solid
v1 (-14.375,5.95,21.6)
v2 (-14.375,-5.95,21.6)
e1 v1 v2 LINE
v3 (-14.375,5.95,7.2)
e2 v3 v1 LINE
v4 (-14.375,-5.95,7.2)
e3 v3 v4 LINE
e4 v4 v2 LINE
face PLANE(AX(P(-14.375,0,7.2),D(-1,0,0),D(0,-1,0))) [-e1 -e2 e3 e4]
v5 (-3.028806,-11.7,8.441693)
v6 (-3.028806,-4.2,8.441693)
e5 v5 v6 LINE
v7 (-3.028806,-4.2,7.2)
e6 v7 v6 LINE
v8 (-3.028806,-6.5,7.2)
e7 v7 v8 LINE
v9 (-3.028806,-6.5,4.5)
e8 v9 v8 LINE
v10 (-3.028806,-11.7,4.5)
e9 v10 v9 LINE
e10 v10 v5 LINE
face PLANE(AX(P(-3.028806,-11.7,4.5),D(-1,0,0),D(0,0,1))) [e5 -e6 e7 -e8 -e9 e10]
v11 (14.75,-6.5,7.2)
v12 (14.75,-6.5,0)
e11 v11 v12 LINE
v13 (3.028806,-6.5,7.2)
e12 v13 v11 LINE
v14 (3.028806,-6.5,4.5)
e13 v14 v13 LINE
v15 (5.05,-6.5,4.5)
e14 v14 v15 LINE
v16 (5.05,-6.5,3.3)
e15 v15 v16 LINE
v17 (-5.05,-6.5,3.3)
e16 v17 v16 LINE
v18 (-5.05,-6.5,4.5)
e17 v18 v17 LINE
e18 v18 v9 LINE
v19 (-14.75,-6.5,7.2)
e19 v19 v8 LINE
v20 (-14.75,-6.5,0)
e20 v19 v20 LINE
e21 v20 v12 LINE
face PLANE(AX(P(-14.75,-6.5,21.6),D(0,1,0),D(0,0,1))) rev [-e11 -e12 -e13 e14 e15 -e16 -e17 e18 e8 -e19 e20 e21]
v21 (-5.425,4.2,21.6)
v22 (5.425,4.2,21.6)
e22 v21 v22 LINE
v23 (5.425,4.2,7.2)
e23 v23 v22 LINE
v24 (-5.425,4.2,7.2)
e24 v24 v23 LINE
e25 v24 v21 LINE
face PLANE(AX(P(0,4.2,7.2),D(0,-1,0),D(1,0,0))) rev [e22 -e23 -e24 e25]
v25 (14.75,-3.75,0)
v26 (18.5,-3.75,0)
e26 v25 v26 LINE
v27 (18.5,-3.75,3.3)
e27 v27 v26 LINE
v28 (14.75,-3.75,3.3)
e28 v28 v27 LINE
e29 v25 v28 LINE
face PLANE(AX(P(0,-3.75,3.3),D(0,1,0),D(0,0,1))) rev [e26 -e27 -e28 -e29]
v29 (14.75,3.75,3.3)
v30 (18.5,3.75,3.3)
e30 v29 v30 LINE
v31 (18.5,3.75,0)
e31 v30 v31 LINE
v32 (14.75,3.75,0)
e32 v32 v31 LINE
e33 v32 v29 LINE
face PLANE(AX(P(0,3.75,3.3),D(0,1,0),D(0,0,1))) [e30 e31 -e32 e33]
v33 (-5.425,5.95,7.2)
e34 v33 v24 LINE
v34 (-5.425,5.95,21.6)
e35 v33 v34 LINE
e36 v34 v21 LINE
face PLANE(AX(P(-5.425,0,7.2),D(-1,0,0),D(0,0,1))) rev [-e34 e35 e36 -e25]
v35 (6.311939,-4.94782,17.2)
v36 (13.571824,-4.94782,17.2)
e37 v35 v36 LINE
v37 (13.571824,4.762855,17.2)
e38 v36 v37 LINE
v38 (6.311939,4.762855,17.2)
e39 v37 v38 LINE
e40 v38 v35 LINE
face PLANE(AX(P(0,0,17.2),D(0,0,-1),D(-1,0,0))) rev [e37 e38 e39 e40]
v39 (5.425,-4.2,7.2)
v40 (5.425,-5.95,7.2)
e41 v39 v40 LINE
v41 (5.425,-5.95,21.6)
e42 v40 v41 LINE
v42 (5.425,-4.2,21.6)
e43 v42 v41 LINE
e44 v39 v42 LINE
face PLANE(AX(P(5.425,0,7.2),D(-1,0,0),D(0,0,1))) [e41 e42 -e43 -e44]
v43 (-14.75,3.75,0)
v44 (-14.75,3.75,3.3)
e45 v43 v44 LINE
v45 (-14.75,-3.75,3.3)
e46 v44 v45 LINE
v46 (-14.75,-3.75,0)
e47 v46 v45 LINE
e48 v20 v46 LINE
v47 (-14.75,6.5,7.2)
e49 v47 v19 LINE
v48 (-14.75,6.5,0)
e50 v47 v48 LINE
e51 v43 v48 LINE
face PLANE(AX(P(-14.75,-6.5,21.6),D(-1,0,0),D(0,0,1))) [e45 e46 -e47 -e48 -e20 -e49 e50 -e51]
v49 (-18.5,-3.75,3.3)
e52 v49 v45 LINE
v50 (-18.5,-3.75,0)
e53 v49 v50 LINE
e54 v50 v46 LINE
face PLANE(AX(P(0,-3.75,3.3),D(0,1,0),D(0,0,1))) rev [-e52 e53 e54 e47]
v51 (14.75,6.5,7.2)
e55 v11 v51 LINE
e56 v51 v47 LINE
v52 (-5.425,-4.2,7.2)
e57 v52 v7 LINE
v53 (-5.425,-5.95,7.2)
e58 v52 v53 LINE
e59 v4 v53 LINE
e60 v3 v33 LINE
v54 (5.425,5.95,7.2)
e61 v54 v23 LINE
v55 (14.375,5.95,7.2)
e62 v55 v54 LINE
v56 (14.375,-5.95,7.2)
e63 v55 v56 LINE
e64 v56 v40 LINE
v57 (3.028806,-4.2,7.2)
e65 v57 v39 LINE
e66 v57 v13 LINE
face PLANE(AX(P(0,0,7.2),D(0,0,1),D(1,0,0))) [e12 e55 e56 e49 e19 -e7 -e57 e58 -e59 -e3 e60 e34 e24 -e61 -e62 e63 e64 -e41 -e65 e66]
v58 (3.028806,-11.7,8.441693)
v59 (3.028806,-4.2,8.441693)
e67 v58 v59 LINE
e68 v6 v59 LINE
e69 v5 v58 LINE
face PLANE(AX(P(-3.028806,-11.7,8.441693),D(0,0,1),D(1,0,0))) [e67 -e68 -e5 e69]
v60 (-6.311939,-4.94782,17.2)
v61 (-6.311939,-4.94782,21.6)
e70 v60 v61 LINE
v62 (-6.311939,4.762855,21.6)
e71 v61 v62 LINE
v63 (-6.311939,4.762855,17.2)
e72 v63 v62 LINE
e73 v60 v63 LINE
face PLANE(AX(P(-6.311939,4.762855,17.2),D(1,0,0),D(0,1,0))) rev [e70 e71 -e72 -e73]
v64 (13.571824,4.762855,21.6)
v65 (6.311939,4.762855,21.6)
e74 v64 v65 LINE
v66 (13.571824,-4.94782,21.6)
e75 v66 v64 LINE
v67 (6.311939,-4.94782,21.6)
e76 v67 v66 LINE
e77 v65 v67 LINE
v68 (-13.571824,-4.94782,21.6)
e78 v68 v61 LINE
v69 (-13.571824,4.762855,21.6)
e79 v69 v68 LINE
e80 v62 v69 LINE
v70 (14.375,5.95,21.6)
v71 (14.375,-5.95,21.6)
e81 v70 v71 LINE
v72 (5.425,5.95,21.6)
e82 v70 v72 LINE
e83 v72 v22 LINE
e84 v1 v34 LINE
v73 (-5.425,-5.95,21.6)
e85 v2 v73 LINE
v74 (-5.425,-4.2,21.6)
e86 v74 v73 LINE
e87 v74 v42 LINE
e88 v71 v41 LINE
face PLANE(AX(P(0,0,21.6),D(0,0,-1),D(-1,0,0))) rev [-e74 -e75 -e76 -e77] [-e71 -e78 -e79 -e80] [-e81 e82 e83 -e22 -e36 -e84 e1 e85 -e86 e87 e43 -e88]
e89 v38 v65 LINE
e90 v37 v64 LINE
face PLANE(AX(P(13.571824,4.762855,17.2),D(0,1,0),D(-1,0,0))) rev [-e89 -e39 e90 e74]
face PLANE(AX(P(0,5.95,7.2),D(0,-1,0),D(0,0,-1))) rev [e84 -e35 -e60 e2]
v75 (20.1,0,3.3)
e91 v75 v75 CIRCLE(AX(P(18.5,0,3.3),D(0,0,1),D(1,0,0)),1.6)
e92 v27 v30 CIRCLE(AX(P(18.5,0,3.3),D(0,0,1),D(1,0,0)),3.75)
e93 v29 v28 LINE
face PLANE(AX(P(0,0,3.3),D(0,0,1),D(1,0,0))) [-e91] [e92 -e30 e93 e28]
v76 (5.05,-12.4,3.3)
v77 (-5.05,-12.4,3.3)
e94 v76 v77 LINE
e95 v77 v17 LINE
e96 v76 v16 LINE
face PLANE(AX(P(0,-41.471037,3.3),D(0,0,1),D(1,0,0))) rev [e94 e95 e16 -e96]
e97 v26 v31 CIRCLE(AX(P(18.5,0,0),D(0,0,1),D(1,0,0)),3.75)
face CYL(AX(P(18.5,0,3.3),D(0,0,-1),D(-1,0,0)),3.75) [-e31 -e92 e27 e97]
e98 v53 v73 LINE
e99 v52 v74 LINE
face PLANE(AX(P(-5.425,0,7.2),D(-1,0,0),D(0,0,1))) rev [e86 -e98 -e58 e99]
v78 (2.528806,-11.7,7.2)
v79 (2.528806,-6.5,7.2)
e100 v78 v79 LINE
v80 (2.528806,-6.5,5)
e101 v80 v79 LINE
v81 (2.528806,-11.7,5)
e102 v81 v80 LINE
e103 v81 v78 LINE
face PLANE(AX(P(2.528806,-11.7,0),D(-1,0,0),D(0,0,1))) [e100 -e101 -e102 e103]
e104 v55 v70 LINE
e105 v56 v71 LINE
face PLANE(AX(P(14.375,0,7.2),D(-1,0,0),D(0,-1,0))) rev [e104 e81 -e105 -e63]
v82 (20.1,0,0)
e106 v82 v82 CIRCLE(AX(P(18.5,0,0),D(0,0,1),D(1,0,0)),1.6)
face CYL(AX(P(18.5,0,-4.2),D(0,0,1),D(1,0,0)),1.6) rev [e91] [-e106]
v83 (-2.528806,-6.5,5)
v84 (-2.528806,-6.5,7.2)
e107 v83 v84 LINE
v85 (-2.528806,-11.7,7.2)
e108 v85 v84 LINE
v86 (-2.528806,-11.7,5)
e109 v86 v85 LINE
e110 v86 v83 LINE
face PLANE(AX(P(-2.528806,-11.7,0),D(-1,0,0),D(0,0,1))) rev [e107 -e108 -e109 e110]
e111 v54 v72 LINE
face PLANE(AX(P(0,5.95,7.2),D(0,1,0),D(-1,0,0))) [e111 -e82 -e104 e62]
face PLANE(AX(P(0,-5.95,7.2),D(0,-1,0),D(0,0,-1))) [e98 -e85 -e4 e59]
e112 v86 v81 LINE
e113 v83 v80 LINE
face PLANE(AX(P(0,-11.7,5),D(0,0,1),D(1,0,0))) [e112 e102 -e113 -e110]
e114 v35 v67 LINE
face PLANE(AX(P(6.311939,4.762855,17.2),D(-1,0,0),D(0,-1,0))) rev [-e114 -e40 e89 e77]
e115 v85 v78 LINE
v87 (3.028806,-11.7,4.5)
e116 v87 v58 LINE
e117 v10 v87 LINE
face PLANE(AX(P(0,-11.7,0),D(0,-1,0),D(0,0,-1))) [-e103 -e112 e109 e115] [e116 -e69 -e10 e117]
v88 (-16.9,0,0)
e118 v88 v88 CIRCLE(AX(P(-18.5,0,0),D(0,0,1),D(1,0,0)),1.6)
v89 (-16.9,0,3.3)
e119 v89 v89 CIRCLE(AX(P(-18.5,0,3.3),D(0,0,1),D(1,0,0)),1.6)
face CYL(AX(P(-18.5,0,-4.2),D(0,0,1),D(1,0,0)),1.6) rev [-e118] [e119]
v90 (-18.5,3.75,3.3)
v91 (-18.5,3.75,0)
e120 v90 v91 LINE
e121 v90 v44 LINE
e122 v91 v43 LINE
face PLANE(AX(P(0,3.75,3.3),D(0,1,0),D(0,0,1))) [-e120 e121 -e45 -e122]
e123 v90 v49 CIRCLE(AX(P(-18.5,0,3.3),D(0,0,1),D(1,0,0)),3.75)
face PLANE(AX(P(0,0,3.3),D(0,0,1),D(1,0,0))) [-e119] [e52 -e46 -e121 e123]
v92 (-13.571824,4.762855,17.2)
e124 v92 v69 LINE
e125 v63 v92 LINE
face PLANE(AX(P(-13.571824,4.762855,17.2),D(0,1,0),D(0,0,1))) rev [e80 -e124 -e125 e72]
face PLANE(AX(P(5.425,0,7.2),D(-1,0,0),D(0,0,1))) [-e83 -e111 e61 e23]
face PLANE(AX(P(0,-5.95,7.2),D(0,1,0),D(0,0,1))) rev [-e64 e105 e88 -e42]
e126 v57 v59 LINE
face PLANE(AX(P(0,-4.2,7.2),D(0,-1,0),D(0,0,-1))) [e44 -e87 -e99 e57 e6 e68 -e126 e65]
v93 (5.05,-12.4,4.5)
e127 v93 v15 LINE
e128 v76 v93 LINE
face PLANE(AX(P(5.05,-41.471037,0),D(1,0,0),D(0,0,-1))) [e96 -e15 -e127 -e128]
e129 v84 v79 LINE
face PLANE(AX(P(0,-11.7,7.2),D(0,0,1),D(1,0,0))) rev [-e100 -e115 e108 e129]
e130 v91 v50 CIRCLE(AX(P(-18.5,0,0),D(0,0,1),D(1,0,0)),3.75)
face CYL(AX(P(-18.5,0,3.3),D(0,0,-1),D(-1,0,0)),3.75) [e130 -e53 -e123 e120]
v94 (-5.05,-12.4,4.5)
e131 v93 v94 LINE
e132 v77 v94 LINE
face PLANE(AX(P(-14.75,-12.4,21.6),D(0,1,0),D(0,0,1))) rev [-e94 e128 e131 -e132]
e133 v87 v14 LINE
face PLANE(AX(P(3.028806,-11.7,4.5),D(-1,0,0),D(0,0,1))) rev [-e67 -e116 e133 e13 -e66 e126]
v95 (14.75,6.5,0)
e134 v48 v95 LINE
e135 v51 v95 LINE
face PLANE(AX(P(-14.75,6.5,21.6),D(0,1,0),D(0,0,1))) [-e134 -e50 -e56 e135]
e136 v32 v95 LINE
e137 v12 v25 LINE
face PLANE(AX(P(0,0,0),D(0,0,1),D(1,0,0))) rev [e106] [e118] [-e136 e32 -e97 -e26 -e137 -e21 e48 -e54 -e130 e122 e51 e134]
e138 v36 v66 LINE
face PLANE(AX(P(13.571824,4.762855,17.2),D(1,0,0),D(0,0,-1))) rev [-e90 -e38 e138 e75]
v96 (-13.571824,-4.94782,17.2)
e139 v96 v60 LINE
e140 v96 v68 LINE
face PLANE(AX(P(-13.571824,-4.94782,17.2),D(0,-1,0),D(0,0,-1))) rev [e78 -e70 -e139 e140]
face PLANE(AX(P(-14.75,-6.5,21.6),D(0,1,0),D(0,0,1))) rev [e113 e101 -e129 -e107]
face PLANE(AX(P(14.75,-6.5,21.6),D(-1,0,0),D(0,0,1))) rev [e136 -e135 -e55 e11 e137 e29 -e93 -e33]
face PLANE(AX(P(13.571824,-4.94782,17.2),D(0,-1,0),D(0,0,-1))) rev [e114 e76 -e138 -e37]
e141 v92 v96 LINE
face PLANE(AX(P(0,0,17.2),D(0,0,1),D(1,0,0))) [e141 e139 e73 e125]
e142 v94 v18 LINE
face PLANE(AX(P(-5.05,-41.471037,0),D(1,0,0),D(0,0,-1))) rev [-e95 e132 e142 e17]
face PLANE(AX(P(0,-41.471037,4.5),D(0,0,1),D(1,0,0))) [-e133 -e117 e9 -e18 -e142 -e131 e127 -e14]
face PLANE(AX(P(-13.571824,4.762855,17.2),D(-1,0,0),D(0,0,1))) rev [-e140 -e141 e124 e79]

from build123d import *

# Parameters (mm, degrees)
EXTRUDE_1_DEPTH       = 3.3
SKETCH_1_3_W          = 29.5
SKETCH_1_3_H          = 13
EXTRUDE_2_DEPTH       = 21.6
SKETCH_3_W            = 29.5
SKETCH_3_H            = 13
CUT_EXTRUDE_1_DEPTH   = 14.4
SKETCH_4_W            = 7.25988549
SKETCH_4_H            = 9.71067486
CUT_EXTRUDE_2_DEPTH   = 4.4
SKETCH_5_W            = 10.1
SKETCH_5_H            = 1.2
EXTRUDE_3_DEPTH       = 8.2
EXTRUDE_4_OUTLINE_W   = 6.05761146
EXTRUDE_4_OUTLINE_H   = 3.941693248
EXTRUDE_4_OUTLINE_W_2 = 5.05761146
EXTRUDE_4_OUTLINE_H_2 = 2.2
EXTRUDE_4_DEPTH       = 7.5
SKETCH_6_R            = 1.6
CUT_EXTRUDE_3_DEPTH   = 7.5


# Read off the part's stored shape, not the designer's step: 凸台-拉伸4
with BuildPart() as part:
    # 草图1 → 凸台-拉伸1 (new body)
    with BuildSketch(Plane.XY):
        with BuildLine():
            ThreePointArc((-18.5, 3.75), (-22.25, 0), (-18.5, -3.75))
            Line((-18.5, -3.75), (-18.5, 3.75))
        make_face()
        with BuildLine():
            Line((-18.5, 3.75), (-18.5, -3.75))
            ThreePointArc((-18.5, -3.75), (-15.848349571, -2.651650429), (-14.75, 0))
            ThreePointArc((-14.75, 0), (-15.848349571, 2.651650429), (-18.5, 3.75))
        make_face()
        with BuildLine():
            Line((-14.75, 3.75), (-18.5, 3.75))
            ThreePointArc((-18.5, 3.75), (-15.848349571, 2.651650429), (-14.75, 0))
            Line((-14.75, 0), (-14.75, 3.75))
        make_face()
        with BuildLine():
            ThreePointArc((-14.75, 0), (-15.848349571, -2.651650429), (-18.5, -3.75))
            Line((-18.5, -3.75), (-14.75, -3.75))
            Line((-14.75, -3.75), (-14.75, 0))
        make_face()
        Polygon((-14.75, 0), (-14.75, -3.75), (14.75, -3.75), (14.75, -4e-09), (14.75, 3.75), (-14.75, 3.75), align=None)
        with BuildLine():
            ThreePointArc((14.75, -4e-09), (15.848349572, -2.651650431), (18.5, -3.75))
            Line((18.5, -3.75), (18.5, 3.75))
            ThreePointArc((18.5, 3.75), (15.848349569, 2.651650428), (14.75, -4e-09))
        make_face()
        with BuildLine():
            Line((18.5, 3.75), (18.5, -3.75))
            ThreePointArc((18.5, -3.75), (21.151650429, -2.651650429), (22.25, 0))
            ThreePointArc((22.25, 0), (21.151650429, 2.651650429), (18.5, 3.75))
        make_face()
        with BuildLine():
            Line((14.75, 3.75), (14.75, -4e-09))
            ThreePointArc((14.75, -4e-09), (15.848349569, 2.651650428), (18.5, 3.75))
            Line((18.5, 3.75), (14.75, 3.75))
        make_face()
        with BuildLine():
            Line((14.75, -4e-09), (14.75, -3.75))
            Line((14.75, -3.75), (18.5, -3.75))
            ThreePointArc((18.5, -3.75), (15.848349572, -2.651650431), (14.75, -4e-09))
        make_face()
    extrude(amount=EXTRUDE_1_DEPTH)

    # 草图1<3> → 凸台-拉伸2 (add)
    with BuildSketch(Plane.XY):
        Rectangle(SKETCH_1_3_W, SKETCH_1_3_H)
    extrude(amount=EXTRUDE_2_DEPTH)

    # 草图3 → 切除-拉伸1 (cut)
    with BuildSketch(Plane.XY.offset(21.6)):
        Rectangle(SKETCH_3_W, SKETCH_3_H)
        Polygon((-14.375, -5.95), (-14.375, 5.95), (-5.425, 5.95), (-5.425, 4.2), (5.425, 4.2), (5.425, 5.95), (14.375, 5.95), (14.375, -5.95), (5.425, -5.95), (5.425, -4.2), (-5.425, -4.2), (-5.425, -5.95), align=None, mode=Mode.SUBTRACT)
    extrude(amount=-CUT_EXTRUDE_1_DEPTH, mode=Mode.SUBTRACT)

    # 草图4 → 切除-拉伸2 (cut)
    with BuildSketch(Plane.XY.offset(21.6)):
        with Locations((-9.941881404, -0.092482618)):
            Rectangle(SKETCH_4_W, SKETCH_4_H)
        with Locations((9.941881404, -0.092482618)):
            Rectangle(SKETCH_4_W, SKETCH_4_H)
    extrude(amount=-CUT_EXTRUDE_2_DEPTH, mode=Mode.SUBTRACT)

    # 草图5 → 凸台-拉伸3 (add)
    with BuildSketch(Plane.XZ.offset(4.2)):
        with Locations((0, 3.9)):
            Rectangle(SKETCH_5_W, SKETCH_5_H)
    extrude(amount=EXTRUDE_3_DEPTH)

    # 凸台-拉伸4 outline → 凸台-拉伸4 (add)
    with BuildSketch(Plane.XZ.offset(4.2)):
        with Locations((0, 6.470846624)):
            Rectangle(EXTRUDE_4_OUTLINE_W, EXTRUDE_4_OUTLINE_H)
        with Locations((0, 6.1)):
            Rectangle(EXTRUDE_4_OUTLINE_W_2, EXTRUDE_4_OUTLINE_H_2, mode=Mode.SUBTRACT)
    extrude(amount=EXTRUDE_4_DEPTH)

    # 草图6 → 切除-拉伸3 (cut)
    with BuildSketch(Plane.XY.offset(3.3)):
        with Locations((-18.5, 0)):
            Circle(SKETCH_6_R)
        with Locations((18.5, 0)):
            Circle(SKETCH_6_R)
    extrude(amount=-CUT_EXTRUDE_3_DEPTH, mode=Mode.SUBTRACT)


solid = part.part
